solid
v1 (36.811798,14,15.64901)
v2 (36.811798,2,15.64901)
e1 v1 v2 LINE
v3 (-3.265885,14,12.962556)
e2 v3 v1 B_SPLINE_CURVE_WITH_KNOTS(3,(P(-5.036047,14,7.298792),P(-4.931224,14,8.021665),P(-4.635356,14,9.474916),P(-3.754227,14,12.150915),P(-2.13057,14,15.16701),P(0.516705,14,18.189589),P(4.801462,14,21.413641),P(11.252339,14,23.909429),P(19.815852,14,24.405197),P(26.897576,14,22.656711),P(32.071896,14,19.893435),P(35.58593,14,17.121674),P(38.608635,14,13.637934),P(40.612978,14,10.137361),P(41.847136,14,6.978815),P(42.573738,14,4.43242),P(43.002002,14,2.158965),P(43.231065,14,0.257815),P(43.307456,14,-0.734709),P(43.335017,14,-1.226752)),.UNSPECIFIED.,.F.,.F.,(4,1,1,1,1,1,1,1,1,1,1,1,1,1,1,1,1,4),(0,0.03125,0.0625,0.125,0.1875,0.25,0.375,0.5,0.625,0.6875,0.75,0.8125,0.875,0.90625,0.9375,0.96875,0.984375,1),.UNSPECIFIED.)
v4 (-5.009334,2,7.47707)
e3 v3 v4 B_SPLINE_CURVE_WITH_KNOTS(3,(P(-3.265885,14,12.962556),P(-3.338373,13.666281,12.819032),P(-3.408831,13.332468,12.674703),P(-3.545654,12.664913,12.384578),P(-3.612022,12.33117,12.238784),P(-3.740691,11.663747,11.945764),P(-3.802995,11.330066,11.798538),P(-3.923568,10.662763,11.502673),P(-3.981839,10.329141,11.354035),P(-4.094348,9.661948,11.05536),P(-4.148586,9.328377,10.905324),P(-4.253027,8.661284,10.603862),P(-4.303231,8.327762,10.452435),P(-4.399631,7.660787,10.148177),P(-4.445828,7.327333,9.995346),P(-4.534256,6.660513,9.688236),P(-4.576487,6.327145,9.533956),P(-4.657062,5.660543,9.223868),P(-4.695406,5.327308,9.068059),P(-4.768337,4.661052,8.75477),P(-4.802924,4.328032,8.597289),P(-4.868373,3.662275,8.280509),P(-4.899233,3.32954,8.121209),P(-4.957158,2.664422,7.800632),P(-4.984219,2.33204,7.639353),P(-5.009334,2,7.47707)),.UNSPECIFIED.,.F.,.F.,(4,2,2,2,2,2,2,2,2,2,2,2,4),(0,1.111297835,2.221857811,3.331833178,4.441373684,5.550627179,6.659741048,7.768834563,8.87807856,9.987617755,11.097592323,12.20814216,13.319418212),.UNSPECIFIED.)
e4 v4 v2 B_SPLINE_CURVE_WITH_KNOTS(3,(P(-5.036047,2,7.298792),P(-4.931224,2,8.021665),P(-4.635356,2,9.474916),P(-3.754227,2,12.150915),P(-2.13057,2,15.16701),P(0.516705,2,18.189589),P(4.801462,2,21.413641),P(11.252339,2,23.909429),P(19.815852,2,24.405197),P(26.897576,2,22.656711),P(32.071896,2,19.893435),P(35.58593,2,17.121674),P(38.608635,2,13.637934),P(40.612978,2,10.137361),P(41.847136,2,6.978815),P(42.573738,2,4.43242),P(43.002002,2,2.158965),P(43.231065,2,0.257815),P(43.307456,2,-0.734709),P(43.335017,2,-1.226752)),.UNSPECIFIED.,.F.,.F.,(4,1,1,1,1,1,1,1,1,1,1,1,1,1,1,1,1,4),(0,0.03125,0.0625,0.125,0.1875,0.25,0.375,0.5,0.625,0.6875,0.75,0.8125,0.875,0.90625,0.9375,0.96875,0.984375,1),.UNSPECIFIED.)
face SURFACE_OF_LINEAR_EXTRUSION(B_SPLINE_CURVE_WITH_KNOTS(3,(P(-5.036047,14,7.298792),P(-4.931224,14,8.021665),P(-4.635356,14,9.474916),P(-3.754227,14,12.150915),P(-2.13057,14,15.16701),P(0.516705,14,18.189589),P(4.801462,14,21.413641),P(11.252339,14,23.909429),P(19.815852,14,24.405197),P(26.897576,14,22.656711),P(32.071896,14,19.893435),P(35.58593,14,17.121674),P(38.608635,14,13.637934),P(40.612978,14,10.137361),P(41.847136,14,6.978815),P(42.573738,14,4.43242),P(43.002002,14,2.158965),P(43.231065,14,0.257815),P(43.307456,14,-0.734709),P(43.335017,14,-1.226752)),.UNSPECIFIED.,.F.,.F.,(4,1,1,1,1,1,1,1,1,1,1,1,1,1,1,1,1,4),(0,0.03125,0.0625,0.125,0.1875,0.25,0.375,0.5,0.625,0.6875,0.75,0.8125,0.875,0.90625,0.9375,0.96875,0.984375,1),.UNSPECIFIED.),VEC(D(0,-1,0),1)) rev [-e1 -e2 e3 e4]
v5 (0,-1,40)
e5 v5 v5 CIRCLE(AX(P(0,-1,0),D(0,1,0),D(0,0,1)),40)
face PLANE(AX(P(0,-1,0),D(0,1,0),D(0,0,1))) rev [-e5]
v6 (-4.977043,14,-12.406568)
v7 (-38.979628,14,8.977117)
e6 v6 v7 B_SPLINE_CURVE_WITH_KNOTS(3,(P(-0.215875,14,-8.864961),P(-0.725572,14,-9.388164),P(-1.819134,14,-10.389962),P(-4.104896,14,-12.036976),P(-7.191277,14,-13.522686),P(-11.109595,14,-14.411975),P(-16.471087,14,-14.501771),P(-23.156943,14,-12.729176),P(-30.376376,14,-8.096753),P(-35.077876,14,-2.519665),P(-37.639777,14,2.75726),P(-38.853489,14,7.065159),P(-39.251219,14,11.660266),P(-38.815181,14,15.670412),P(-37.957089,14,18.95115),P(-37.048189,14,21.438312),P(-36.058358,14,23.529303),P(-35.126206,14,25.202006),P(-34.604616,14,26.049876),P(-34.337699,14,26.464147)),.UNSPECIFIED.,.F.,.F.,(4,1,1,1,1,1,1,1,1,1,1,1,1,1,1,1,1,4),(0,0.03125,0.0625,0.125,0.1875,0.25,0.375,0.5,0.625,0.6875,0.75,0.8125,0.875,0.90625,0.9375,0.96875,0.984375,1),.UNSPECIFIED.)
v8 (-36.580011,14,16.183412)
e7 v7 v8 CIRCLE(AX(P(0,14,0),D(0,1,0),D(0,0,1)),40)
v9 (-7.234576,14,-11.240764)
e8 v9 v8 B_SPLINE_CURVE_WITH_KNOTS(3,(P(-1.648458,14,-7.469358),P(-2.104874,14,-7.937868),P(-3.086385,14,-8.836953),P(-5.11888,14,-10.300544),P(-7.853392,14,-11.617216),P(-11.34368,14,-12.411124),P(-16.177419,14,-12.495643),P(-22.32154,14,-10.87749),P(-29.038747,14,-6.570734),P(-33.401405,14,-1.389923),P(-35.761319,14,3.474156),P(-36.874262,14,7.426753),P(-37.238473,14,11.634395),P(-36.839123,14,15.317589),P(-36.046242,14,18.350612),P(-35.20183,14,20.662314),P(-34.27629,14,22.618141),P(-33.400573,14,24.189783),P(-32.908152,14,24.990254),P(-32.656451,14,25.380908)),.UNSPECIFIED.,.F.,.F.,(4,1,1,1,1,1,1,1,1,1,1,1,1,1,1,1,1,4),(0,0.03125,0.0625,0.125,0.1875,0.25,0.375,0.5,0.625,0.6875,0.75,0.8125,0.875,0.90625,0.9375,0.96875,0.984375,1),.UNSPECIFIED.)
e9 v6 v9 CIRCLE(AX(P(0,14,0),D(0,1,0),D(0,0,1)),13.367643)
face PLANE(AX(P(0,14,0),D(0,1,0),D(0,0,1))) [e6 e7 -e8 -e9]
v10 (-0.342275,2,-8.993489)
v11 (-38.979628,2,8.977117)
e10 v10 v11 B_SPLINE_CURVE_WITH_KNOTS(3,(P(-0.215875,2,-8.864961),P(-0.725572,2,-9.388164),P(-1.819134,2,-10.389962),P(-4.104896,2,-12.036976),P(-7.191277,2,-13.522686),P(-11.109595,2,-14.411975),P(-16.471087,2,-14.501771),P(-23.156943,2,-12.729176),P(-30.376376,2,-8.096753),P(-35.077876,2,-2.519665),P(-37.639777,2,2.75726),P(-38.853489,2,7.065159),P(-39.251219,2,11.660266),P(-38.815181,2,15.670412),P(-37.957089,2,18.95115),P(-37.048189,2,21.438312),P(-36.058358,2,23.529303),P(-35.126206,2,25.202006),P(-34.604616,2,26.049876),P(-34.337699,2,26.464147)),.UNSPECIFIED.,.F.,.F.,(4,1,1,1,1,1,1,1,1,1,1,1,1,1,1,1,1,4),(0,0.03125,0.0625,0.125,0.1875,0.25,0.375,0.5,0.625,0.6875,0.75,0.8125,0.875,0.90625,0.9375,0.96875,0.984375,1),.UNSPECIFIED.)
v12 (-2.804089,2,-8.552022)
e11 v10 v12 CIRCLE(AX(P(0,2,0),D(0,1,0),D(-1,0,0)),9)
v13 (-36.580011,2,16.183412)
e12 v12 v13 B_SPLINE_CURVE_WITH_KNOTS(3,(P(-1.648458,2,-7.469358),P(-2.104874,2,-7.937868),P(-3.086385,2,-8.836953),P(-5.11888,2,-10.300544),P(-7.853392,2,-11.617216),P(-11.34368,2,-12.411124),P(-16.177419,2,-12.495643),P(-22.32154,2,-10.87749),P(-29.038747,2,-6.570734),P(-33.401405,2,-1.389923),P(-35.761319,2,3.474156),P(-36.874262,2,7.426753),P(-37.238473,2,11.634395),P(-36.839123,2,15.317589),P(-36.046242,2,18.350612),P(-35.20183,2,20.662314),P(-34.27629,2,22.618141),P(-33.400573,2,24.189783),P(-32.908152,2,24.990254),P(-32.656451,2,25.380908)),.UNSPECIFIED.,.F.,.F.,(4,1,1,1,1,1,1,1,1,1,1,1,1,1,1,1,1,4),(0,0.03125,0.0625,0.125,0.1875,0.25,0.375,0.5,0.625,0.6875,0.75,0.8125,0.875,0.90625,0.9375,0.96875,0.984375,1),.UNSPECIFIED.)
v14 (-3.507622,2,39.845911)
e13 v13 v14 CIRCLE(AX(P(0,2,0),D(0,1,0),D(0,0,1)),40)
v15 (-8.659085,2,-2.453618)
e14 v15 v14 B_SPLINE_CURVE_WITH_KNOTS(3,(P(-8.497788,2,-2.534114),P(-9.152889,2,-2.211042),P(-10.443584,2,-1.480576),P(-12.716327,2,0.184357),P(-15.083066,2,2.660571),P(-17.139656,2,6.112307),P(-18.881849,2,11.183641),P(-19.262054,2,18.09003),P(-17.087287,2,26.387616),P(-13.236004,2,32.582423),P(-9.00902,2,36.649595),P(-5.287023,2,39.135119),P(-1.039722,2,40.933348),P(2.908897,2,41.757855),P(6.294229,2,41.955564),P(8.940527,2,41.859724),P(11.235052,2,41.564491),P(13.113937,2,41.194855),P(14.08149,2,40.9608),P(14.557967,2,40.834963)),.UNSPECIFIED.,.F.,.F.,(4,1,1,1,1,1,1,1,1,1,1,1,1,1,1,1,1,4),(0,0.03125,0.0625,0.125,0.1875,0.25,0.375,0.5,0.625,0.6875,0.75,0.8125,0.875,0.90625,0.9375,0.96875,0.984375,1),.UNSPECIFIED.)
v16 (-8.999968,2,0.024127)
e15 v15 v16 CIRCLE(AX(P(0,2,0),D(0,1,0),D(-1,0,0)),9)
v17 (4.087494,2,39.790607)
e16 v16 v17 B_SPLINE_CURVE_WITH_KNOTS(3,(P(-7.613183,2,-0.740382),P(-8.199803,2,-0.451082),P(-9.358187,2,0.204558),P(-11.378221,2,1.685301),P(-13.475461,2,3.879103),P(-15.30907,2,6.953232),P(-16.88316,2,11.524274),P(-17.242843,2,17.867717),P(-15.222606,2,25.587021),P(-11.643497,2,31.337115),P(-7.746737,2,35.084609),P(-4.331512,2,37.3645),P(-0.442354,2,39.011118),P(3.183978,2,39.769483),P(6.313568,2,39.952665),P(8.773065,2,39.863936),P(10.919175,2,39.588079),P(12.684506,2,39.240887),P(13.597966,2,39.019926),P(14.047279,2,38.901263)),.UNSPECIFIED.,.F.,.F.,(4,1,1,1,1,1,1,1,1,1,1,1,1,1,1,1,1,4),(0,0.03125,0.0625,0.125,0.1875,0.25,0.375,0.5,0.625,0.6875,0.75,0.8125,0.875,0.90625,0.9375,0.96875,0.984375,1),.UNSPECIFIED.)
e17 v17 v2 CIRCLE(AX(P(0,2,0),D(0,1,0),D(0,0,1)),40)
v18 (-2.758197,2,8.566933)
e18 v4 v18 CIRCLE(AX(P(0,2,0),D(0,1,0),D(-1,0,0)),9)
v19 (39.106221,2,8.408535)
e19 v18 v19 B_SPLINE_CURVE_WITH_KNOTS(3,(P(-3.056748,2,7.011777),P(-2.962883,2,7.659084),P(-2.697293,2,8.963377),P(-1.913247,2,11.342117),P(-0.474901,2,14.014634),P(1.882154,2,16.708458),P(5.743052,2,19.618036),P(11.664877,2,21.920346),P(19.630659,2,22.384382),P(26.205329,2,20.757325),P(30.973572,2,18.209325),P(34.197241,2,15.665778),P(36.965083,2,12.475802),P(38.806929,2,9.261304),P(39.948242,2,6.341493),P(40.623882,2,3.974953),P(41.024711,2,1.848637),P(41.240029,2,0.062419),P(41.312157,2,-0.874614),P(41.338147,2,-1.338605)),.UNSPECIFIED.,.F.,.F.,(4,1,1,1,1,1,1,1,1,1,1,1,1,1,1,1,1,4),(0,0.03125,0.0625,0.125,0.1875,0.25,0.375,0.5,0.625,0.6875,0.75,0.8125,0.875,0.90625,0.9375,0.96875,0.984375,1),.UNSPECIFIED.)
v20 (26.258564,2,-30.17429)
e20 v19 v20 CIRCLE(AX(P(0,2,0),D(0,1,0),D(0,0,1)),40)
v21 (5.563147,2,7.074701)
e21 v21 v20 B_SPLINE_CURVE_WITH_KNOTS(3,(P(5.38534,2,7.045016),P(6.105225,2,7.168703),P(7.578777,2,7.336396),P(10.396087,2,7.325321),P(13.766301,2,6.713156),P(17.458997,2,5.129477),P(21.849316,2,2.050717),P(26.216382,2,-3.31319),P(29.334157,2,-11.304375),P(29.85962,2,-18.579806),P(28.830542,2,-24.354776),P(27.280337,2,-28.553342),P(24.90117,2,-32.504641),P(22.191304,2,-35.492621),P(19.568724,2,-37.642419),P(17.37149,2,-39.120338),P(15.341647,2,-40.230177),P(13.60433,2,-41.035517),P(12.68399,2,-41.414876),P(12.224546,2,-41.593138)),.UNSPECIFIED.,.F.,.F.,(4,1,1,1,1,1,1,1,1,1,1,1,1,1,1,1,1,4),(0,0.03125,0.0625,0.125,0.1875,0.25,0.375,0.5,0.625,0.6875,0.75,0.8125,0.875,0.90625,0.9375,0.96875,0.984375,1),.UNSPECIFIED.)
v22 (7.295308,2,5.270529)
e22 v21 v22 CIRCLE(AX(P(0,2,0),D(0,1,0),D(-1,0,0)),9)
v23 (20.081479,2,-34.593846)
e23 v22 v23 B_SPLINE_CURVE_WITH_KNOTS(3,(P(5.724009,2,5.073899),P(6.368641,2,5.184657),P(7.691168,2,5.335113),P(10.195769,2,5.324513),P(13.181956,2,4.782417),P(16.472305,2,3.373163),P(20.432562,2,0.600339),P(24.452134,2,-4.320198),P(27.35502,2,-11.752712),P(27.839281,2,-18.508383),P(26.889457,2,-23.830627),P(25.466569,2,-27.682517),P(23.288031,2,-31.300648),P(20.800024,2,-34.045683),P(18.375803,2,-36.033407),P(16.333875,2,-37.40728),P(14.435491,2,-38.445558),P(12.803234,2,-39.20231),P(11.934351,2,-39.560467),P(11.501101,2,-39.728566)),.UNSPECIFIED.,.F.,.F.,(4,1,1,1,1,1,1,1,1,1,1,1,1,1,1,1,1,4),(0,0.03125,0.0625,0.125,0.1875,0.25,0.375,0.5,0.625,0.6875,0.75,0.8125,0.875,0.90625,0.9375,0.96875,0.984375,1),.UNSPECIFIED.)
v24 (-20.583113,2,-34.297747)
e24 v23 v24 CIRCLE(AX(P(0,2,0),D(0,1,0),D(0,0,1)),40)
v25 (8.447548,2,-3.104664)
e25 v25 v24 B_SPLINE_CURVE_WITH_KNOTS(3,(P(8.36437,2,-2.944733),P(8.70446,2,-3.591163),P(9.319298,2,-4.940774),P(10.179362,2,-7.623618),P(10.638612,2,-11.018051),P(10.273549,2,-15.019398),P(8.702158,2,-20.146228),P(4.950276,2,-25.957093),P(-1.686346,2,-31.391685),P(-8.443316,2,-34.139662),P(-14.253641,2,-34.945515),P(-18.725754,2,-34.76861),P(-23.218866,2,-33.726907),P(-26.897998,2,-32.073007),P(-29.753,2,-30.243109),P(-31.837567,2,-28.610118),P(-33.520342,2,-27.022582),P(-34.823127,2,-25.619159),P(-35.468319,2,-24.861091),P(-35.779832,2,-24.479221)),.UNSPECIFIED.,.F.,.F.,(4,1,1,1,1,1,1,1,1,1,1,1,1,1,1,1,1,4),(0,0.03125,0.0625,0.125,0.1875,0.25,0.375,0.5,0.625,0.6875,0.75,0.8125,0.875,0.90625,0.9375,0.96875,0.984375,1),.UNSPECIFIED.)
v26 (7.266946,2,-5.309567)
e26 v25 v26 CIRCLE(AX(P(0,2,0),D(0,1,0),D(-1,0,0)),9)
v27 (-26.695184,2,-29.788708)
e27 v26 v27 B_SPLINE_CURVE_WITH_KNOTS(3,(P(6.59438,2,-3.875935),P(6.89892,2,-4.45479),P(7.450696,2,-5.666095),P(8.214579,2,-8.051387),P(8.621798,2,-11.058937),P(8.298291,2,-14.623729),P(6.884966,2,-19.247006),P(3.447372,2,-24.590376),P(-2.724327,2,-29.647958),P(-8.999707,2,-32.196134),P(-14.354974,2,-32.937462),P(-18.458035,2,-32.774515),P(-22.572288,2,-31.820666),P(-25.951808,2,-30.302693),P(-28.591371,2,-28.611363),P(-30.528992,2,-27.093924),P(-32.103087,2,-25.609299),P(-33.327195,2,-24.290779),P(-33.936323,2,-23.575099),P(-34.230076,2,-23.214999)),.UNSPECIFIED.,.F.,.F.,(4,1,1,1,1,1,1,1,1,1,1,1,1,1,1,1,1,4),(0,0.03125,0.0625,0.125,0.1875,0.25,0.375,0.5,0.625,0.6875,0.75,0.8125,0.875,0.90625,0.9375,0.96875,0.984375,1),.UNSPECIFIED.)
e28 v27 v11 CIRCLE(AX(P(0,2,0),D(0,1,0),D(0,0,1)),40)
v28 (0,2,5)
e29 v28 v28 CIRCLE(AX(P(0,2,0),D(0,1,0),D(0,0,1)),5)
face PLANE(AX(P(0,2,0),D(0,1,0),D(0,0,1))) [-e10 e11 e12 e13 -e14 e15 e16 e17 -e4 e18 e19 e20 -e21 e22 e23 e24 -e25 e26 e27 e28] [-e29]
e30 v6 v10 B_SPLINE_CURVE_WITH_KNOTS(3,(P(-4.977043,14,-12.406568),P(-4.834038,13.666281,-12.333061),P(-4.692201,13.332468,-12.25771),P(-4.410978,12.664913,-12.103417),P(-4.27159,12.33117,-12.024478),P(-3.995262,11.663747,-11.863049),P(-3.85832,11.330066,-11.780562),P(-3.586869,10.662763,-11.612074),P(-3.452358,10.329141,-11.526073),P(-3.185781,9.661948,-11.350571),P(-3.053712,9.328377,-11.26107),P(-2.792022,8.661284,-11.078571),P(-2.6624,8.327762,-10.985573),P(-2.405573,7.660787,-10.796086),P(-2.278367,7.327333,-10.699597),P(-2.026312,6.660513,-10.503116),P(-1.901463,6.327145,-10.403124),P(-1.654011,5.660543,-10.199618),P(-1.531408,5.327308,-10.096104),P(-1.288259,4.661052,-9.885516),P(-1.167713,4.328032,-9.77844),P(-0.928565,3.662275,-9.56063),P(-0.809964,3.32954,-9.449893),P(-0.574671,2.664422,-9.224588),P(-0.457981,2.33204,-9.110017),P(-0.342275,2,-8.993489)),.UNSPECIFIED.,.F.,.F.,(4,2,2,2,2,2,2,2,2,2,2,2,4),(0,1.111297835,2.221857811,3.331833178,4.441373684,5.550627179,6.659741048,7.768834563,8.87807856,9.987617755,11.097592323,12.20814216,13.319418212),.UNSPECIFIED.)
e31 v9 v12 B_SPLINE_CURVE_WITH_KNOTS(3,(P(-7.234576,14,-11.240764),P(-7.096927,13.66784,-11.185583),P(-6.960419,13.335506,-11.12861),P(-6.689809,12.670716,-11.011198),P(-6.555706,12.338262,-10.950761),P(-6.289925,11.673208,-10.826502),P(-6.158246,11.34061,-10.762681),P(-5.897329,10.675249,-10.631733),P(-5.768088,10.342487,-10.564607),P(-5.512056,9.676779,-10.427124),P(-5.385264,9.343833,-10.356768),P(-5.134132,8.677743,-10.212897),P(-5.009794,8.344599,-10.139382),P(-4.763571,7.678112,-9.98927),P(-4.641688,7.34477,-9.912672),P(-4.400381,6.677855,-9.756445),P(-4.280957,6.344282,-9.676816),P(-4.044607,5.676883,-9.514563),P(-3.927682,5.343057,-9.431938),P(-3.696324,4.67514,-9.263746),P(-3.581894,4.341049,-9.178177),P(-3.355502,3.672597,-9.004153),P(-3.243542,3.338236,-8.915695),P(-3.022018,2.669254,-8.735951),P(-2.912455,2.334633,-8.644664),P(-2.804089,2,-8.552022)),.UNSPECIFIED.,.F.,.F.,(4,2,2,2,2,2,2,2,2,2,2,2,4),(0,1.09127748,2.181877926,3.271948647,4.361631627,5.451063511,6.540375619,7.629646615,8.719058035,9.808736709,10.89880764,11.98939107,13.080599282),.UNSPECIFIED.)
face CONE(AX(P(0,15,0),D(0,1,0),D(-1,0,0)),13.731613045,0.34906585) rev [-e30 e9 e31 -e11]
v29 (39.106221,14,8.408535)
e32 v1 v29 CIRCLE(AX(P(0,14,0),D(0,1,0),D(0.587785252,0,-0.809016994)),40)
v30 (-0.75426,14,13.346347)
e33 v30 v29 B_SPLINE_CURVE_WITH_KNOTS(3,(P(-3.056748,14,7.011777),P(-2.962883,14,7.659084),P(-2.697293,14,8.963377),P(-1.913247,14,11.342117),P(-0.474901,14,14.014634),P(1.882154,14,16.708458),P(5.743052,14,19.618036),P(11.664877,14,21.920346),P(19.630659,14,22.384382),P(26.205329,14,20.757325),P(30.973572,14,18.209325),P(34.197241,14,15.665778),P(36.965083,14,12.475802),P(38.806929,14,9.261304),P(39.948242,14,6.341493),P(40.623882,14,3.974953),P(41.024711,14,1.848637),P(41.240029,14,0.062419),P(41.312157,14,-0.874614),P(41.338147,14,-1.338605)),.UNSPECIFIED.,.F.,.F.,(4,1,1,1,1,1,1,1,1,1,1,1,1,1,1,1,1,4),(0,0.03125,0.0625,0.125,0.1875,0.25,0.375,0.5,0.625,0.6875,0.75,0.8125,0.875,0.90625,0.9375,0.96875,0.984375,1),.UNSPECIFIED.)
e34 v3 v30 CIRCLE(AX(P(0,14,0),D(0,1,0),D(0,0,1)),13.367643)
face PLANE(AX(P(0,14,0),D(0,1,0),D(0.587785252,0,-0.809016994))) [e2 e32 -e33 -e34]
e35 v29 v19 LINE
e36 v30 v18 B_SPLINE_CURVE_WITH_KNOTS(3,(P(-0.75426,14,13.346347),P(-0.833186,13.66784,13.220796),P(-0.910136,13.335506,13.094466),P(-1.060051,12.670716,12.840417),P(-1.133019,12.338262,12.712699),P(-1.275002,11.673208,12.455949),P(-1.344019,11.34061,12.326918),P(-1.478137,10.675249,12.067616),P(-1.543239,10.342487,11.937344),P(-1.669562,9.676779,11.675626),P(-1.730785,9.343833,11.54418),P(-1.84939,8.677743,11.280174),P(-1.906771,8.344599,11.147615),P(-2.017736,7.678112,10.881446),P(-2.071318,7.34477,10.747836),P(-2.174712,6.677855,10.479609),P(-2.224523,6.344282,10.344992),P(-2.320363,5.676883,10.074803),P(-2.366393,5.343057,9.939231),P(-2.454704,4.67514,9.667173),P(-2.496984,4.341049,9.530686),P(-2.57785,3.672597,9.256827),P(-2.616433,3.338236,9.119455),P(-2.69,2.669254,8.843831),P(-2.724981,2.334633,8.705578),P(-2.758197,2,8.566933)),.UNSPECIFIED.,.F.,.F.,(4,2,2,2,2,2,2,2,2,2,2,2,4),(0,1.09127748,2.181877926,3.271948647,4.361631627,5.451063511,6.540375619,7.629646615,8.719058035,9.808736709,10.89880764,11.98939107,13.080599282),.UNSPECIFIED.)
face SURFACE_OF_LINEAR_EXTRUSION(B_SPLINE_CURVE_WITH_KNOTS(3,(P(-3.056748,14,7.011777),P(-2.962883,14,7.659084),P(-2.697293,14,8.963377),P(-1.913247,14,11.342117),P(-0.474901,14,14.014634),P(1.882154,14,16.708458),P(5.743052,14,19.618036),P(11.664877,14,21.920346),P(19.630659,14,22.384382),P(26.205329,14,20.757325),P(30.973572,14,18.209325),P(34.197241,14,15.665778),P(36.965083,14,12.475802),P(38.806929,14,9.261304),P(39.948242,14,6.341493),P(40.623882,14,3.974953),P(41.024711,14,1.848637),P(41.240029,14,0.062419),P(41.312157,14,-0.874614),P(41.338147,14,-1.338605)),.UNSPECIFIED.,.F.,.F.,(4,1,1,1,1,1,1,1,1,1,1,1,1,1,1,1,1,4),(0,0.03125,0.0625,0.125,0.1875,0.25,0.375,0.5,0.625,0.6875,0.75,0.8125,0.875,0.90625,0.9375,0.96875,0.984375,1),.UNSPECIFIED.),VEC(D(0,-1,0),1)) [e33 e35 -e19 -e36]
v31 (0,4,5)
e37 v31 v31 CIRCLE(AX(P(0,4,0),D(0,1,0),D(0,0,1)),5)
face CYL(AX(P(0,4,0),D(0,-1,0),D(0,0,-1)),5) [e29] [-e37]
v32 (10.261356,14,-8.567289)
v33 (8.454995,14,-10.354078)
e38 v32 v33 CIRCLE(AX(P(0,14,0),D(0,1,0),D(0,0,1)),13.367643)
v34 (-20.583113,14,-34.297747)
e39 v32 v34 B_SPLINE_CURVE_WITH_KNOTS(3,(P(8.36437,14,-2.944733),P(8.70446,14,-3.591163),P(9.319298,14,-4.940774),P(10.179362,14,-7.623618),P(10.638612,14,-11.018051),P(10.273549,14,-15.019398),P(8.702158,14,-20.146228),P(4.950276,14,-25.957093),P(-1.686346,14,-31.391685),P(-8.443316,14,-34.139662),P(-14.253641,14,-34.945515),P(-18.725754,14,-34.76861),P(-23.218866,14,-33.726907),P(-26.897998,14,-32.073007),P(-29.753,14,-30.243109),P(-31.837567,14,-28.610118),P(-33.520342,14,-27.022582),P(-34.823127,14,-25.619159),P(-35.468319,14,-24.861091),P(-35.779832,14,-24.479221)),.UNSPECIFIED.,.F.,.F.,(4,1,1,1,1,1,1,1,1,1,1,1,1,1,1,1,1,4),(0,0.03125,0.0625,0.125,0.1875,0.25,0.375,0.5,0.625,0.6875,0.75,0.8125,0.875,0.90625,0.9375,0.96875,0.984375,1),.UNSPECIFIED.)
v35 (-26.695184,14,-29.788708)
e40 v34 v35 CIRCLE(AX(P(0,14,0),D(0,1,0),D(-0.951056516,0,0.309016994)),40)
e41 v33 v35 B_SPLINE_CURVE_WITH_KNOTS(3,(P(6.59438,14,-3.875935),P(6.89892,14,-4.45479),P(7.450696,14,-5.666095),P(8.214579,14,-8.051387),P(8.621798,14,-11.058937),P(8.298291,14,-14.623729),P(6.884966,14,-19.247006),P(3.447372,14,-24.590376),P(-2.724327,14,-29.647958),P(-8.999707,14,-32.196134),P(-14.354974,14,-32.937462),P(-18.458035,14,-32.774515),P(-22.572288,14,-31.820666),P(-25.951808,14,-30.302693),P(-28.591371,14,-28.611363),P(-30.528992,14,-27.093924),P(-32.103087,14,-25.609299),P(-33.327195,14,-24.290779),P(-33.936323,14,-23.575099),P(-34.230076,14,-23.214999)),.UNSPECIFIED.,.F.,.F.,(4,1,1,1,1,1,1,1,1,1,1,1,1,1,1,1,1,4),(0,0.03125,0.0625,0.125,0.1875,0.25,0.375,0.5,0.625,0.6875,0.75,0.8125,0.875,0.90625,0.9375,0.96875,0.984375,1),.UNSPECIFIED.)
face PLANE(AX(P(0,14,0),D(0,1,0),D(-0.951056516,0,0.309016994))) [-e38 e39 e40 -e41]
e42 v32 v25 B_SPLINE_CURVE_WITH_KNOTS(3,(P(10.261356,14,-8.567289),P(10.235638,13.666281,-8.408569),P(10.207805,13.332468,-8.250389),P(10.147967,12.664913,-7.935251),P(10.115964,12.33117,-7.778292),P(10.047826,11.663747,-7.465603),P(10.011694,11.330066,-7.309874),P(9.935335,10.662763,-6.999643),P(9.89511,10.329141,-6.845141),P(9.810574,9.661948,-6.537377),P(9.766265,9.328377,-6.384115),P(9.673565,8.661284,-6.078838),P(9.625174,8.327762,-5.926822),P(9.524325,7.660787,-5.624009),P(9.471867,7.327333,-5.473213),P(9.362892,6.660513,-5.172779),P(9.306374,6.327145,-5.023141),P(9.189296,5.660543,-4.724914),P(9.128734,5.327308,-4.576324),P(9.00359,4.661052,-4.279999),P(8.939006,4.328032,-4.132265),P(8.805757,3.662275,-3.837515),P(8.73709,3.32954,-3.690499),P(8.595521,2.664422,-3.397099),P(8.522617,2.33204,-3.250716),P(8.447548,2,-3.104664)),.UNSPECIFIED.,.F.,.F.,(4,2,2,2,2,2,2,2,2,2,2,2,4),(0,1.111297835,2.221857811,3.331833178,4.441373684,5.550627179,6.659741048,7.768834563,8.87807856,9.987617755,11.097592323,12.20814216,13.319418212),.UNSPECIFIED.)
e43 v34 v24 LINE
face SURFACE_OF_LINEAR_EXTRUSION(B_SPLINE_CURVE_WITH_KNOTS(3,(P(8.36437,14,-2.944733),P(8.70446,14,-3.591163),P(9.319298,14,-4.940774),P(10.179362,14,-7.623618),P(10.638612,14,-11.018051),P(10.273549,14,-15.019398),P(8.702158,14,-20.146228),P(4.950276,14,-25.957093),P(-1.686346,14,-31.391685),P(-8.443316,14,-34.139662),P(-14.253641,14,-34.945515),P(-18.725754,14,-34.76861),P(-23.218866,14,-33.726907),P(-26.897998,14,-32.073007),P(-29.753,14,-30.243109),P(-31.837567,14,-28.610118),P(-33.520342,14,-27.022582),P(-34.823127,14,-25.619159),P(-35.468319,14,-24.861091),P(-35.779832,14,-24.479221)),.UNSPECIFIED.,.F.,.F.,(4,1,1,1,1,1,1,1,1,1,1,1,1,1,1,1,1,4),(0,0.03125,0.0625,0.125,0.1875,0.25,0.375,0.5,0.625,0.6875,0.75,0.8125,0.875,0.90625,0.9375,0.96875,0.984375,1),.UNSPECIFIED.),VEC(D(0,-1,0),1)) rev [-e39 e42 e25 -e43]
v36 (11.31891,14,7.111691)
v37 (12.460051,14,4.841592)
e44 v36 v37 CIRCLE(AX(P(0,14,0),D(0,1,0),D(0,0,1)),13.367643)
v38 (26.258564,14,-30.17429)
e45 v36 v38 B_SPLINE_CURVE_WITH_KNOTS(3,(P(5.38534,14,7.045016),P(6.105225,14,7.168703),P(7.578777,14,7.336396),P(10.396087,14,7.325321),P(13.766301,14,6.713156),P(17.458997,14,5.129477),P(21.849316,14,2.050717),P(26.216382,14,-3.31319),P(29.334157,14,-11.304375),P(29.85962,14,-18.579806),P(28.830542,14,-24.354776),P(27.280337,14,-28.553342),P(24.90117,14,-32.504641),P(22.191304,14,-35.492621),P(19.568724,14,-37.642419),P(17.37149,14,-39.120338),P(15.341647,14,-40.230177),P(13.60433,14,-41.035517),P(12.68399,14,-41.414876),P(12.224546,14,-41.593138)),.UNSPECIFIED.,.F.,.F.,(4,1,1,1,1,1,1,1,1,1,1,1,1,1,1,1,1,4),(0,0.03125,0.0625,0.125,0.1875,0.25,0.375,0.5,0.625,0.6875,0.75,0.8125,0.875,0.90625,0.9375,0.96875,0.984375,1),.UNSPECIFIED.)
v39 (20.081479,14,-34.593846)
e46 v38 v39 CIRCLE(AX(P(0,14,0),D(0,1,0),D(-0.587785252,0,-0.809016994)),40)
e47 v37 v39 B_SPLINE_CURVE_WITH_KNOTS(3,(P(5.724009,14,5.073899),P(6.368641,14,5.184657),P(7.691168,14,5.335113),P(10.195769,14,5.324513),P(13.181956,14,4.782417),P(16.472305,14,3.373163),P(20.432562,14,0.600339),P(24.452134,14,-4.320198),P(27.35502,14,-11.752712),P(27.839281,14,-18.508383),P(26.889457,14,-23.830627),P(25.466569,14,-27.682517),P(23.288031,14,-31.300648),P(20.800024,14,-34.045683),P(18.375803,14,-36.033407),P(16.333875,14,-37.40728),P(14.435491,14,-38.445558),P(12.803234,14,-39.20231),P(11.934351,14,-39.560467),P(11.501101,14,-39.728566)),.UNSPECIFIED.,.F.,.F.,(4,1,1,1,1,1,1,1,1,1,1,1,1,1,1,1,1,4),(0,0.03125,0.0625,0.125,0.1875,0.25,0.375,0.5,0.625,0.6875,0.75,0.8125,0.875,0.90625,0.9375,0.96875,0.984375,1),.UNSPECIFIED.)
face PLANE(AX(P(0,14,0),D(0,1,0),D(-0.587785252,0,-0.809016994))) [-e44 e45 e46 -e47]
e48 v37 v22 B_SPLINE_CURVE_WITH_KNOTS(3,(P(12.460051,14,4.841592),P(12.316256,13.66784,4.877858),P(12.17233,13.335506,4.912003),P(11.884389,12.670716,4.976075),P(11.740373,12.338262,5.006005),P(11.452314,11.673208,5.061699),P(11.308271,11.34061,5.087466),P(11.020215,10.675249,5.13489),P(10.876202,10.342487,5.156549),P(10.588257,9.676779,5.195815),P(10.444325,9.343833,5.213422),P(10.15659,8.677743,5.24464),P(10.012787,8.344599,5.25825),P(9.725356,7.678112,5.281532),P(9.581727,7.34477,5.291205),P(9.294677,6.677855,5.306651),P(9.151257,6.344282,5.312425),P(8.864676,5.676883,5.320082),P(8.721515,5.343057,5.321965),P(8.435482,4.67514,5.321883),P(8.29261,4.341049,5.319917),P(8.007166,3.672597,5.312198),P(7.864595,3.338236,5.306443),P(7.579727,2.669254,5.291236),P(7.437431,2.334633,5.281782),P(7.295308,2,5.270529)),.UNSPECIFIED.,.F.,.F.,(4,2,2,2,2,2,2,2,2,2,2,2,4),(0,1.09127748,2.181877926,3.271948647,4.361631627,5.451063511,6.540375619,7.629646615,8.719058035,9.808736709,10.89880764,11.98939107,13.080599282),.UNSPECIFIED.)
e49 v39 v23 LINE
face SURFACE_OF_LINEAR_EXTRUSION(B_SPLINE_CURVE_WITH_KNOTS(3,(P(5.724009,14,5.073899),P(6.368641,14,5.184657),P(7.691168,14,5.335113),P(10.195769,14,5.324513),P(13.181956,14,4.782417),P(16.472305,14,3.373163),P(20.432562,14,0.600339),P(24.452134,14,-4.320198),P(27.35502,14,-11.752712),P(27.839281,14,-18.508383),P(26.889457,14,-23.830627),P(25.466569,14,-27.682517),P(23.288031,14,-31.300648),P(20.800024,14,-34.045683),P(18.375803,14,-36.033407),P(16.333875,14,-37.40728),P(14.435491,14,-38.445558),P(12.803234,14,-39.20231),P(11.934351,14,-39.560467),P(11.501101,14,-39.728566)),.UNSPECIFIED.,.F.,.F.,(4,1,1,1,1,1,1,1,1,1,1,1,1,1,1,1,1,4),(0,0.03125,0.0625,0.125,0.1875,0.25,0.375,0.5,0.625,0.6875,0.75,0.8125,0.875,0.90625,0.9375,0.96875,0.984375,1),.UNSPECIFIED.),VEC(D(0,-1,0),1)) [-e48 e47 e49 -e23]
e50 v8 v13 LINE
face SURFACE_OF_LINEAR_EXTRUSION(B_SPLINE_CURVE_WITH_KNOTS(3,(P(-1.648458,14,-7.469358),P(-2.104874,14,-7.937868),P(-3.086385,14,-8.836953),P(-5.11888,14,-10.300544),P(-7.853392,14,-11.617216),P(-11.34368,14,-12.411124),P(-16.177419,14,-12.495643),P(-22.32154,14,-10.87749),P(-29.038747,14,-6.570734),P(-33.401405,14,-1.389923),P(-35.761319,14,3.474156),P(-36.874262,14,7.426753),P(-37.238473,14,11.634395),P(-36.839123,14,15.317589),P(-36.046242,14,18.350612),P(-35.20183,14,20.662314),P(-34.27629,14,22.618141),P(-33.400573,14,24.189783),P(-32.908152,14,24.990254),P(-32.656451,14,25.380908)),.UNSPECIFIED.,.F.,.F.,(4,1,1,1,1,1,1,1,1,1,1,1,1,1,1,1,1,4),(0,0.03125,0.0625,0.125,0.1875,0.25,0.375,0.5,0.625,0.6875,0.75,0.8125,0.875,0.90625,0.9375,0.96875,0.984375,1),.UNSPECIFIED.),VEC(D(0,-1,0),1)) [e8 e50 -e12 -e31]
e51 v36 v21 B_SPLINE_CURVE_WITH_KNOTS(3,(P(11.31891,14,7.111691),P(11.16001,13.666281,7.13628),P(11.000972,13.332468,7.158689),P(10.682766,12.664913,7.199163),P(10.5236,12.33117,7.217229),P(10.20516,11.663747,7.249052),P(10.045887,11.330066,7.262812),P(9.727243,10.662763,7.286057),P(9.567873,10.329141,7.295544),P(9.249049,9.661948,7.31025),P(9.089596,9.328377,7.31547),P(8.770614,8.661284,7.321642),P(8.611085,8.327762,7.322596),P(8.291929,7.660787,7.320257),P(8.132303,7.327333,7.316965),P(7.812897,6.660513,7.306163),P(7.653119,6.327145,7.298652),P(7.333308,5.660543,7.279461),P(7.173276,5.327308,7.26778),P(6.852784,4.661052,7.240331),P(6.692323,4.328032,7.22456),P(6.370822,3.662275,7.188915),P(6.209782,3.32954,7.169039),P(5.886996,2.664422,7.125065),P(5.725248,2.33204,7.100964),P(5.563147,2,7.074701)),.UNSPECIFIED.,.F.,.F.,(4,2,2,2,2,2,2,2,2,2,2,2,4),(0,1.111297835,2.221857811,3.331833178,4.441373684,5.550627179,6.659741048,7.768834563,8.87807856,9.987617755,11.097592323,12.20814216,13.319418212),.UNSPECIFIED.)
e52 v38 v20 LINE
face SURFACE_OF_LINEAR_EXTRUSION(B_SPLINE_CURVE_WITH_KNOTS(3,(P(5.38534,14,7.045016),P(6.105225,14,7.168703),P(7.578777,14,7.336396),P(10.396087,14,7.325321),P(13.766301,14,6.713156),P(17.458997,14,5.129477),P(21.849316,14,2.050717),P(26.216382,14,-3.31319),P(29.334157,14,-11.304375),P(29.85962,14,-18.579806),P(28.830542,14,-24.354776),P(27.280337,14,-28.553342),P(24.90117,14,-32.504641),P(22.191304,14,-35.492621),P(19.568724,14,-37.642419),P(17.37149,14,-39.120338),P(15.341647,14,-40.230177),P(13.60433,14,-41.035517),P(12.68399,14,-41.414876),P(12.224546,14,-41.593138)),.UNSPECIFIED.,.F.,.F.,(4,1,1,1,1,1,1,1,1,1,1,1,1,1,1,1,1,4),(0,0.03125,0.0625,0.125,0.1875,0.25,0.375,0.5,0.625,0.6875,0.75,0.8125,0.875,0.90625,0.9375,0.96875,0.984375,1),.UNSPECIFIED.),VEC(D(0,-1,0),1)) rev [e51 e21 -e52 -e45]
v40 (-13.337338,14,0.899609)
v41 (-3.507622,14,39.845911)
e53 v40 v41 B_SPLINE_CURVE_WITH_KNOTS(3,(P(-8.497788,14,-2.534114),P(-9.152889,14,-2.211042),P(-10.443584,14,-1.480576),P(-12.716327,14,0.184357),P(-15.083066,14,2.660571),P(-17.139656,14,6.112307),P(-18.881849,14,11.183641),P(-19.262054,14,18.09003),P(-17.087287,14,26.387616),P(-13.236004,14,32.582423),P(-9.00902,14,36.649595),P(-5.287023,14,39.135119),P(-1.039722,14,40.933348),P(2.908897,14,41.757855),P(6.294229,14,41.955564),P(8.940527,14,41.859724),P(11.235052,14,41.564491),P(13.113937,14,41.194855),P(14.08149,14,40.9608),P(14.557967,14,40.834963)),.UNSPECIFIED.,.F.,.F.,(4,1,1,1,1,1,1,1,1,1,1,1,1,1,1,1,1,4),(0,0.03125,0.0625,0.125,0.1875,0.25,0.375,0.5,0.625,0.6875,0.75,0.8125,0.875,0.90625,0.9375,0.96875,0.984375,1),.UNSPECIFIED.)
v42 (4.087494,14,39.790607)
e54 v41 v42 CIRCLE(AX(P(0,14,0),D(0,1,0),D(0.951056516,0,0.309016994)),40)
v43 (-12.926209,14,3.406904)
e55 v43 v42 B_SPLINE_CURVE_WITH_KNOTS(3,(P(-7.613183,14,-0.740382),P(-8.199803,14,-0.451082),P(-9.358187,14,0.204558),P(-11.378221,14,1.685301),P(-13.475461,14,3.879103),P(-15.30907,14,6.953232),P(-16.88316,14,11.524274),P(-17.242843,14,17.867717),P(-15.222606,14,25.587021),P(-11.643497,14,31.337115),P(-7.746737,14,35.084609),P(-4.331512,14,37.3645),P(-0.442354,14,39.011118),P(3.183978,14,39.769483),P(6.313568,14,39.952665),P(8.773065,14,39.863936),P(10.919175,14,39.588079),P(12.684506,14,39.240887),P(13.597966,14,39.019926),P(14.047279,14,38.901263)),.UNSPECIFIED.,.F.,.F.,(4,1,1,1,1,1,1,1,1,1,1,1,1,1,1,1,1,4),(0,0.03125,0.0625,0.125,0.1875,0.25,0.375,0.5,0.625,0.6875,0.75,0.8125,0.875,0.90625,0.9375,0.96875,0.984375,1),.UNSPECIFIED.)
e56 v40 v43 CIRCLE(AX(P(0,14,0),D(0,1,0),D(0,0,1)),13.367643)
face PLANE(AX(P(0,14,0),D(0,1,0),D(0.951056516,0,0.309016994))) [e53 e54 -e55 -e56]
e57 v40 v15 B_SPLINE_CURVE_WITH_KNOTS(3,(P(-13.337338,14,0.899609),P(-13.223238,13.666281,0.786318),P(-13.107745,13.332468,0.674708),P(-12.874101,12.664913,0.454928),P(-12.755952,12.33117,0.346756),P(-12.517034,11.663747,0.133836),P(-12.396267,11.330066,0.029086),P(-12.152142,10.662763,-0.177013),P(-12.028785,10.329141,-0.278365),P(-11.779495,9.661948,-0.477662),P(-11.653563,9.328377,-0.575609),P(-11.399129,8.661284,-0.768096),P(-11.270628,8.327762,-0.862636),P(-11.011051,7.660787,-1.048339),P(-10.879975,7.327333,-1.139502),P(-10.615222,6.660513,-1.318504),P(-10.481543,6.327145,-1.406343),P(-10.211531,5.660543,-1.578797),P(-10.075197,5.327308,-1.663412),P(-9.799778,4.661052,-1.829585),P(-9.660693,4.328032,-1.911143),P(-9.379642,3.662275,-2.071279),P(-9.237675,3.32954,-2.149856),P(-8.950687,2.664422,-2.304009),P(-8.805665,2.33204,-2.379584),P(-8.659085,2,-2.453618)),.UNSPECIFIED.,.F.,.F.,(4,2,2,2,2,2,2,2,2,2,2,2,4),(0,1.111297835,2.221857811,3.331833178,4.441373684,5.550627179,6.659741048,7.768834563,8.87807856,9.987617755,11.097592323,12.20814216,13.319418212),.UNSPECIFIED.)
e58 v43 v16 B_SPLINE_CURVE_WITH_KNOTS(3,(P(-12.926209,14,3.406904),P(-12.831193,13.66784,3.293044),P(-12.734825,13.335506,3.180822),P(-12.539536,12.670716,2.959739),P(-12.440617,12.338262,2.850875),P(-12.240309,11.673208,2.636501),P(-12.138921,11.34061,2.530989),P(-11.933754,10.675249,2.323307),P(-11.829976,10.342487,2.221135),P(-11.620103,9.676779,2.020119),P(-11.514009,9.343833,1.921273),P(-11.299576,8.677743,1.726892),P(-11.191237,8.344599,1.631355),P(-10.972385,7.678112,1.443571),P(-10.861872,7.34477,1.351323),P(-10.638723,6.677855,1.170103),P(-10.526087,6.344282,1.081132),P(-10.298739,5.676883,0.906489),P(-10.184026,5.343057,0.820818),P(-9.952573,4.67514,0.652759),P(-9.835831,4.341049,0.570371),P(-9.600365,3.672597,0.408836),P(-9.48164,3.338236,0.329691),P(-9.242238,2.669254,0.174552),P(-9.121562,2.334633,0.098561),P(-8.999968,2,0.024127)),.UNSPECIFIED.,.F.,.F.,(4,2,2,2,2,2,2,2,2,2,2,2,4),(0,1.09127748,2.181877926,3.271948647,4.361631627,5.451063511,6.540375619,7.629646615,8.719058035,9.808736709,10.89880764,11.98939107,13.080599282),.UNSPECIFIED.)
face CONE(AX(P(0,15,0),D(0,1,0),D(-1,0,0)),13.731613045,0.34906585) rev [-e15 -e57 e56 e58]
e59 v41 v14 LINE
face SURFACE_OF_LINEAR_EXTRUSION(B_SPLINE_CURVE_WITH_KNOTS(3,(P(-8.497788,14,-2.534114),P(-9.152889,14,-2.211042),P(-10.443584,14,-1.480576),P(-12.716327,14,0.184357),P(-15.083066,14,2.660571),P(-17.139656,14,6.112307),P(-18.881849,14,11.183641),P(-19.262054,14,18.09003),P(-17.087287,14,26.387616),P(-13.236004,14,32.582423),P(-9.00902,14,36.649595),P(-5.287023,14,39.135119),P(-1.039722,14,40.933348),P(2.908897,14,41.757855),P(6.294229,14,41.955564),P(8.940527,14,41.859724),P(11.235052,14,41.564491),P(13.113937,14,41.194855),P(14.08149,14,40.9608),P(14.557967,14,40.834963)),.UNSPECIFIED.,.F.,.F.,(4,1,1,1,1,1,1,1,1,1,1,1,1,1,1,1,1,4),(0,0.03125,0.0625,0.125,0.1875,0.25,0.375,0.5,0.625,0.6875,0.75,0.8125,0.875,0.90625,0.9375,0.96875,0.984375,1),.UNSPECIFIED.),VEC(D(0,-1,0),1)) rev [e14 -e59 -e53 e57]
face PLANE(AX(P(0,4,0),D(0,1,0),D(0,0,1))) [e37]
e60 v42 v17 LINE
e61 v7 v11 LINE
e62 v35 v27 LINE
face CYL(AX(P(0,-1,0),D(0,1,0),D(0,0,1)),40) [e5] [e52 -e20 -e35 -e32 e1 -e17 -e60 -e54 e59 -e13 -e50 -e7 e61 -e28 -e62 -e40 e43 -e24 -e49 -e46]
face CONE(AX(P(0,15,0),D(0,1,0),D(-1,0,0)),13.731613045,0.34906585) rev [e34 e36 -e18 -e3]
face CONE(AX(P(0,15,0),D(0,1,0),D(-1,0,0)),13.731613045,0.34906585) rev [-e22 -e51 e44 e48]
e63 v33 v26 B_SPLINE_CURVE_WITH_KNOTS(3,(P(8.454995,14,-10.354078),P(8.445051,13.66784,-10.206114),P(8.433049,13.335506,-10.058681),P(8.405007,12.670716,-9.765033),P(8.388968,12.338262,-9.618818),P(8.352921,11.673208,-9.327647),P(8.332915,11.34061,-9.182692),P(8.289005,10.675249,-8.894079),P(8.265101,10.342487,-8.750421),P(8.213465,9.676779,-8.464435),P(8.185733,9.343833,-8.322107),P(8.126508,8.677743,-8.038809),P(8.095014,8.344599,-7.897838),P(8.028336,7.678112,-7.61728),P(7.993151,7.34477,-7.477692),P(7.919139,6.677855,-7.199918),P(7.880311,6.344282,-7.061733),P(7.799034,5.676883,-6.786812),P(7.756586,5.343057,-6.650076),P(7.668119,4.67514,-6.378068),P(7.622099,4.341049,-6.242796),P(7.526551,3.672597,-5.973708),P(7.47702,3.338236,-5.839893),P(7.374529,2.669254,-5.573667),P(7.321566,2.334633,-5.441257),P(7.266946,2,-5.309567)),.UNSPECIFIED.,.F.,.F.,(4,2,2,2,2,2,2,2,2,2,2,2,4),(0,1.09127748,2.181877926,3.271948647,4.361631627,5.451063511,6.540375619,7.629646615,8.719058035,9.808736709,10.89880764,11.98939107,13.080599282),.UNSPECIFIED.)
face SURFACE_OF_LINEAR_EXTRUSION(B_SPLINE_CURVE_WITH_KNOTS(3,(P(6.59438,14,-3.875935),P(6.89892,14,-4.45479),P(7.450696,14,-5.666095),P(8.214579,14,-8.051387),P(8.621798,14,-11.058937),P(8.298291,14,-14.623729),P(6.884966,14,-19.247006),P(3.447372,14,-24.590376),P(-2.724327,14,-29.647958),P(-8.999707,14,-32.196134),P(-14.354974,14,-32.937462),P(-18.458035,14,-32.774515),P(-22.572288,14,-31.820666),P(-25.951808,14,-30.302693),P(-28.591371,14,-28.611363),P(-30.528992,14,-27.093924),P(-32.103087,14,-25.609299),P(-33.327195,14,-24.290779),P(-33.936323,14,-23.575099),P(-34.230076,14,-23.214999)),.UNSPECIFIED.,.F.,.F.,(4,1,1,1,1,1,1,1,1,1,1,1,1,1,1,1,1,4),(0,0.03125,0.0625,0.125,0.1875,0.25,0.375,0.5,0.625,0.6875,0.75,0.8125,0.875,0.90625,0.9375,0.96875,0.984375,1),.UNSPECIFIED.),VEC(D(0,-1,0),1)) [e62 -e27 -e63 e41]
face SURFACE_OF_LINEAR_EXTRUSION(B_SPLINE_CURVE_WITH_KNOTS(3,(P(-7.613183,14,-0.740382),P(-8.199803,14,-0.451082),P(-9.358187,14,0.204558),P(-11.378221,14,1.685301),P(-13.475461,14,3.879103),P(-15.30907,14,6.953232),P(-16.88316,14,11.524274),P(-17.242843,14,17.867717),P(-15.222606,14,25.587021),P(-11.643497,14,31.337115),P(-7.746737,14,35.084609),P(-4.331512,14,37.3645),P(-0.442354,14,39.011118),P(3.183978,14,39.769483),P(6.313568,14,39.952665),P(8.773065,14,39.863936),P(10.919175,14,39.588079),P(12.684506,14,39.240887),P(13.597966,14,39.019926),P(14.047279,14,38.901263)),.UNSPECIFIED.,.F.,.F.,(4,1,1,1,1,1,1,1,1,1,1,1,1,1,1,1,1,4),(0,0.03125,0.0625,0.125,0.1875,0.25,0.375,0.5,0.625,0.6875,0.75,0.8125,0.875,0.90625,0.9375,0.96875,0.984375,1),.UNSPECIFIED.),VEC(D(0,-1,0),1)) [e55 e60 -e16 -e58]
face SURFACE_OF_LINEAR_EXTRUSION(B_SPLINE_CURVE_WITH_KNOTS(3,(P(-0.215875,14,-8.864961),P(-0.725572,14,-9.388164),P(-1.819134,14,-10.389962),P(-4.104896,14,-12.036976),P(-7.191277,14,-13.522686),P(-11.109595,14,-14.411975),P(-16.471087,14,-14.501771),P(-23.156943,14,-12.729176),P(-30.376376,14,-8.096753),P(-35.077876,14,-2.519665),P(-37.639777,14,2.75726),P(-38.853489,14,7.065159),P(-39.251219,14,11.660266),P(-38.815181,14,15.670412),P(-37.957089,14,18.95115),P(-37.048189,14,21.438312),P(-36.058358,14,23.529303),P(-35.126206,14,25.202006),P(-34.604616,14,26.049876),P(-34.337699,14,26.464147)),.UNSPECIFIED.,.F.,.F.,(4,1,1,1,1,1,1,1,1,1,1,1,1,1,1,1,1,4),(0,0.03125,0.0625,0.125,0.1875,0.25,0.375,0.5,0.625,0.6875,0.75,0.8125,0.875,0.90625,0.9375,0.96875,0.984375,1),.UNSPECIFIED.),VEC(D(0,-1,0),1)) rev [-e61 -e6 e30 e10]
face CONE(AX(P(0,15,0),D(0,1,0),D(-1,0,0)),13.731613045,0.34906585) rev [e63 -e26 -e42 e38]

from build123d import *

# Parameters (mm, degrees)
BOSS_EXTRUDE1_DEPTH      = 2
BOSS_EXTRUDE1_DEPTH_BACK = 1
SKETCH1_R                = 40
BOSS_EXTRUDE2_DEPTH      = 12
CIRPATTERN1_COUNT        = 5
SKETCH4_R                = 5
BOSS_EXTRUDE3_DEPTH      = 2


with BuildPart() as part:
    # Sketch1 → Boss-Extrude1 (new, two sides: drawn at the far end of the back side and taken through both)
    with BuildSketch(Plane(origin=(0, 0, 0), x_dir=(1, 0, 0), z_dir=(0, 1, 0)).offset(-BOSS_EXTRUDE1_DEPTH_BACK)):
        Circle(SKETCH1_R)
    extrude(amount=BOSS_EXTRUDE1_DEPTH + BOSS_EXTRUDE1_DEPTH_BACK)

    # Sketch2 → Boss-Extrude2 (add)
    with BuildSketch(Plane(origin=(0, 2, 0), x_dir=(1, 0, 0), z_dir=(0, 1, 0))):
        with BuildLine():
            add(Edge.make_bspline(
                [(-1.648457537, 7.469358199), (-2.104873805, 7.937868262), (-3.086385024, 8.83695283), (-5.118879824, 10.300544164), (-7.85339222, 11.617216343), (-11.343679645, 12.411124094), (-16.177419051, 12.495643266), (-22.32154029, 10.877489917), (-29.038746805, 6.570733882), (-33.401405456, 1.389922557), (-35.761319101, -3.474155864), (-36.874262221, -7.426752725), (-37.238472583, -11.634394908), (-36.915436622, -14.613747914), (-36.587236294, -16.149943806), (-36.580010635, -16.183411937)],
                knots=[0, 0, 0, 0, 0.03125, 0.0625, 0.125, 0.1875, 0.25, 0.375, 0.5, 0.625, 0.6875, 0.75, 0.8125, 0.875, 0.876391371, 0.876391371, 0.876391371, 0.876391371], degree=3))
            Line((-1.648457537, 7.469358199), (-0.215875004, 8.864961038))
            add(Edge.make_bspline(
                [(-0.215875004, 8.864961038), (-0.725572372, 9.388164005), (-1.819134041, 10.389961885), (-4.104895535, 12.036976258), (-7.191277155, 13.522686378), (-11.109594838, 14.411975027), (-16.471086792, 14.501770787), (-23.156943321, 12.729175608), (-30.376376148, 8.096753493), (-35.077876345, 2.519665418), (-37.639776615, -2.757260327), (-38.616179028, -6.222859697), (-38.916318413, -8.348122546), (-38.979627679, -8.9771168)],
                knots=[0, 0, 0, 0, 0.03125, 0.0625, 0.125, 0.1875, 0.25, 0.375, 0.5, 0.625, 0.6875, 0.75, 0.775839178, 0.775839178, 0.775839178, 0.775839178], degree=3))
            ThreePointArc((-38.979627679, -8.9771168), (-37.951250413, -12.637349092), (-36.580010635, -16.183411937))
        make_face()
    boss_extrude2 = extrude(amount=BOSS_EXTRUDE2_DEPTH)

    # CirPattern1: Boss-Extrude2 ×5 about axis
    cirpattern1_axis = Axis((0, 2, 0), (0, 1, 0))
    for i in range(1, CIRPATTERN1_COUNT):
        add(boss_extrude2.rotate(cirpattern1_axis, i * 360 / CIRPATTERN1_COUNT))

    # Sketch3 → Cut-Revolve1 (revolve, cut)
    with BuildSketch(Plane.XY):
        Polygon((0, 2), (-9, 2), (-13.731613045, 15), (0, 15), align=None)
    revolve(axis=Axis((0, 15, 0), (0, -1, 0)), mode=Mode.SUBTRACT)

    # Sketch4 → Boss-Extrude3 (add)
    with BuildSketch(Plane(origin=(0, 2, 0), x_dir=(1, 0, 0), z_dir=(0, 1, 0))):
        Circle(SKETCH4_R)
    extrude(amount=BOSS_EXTRUDE3_DEPTH)


solid = part.part
